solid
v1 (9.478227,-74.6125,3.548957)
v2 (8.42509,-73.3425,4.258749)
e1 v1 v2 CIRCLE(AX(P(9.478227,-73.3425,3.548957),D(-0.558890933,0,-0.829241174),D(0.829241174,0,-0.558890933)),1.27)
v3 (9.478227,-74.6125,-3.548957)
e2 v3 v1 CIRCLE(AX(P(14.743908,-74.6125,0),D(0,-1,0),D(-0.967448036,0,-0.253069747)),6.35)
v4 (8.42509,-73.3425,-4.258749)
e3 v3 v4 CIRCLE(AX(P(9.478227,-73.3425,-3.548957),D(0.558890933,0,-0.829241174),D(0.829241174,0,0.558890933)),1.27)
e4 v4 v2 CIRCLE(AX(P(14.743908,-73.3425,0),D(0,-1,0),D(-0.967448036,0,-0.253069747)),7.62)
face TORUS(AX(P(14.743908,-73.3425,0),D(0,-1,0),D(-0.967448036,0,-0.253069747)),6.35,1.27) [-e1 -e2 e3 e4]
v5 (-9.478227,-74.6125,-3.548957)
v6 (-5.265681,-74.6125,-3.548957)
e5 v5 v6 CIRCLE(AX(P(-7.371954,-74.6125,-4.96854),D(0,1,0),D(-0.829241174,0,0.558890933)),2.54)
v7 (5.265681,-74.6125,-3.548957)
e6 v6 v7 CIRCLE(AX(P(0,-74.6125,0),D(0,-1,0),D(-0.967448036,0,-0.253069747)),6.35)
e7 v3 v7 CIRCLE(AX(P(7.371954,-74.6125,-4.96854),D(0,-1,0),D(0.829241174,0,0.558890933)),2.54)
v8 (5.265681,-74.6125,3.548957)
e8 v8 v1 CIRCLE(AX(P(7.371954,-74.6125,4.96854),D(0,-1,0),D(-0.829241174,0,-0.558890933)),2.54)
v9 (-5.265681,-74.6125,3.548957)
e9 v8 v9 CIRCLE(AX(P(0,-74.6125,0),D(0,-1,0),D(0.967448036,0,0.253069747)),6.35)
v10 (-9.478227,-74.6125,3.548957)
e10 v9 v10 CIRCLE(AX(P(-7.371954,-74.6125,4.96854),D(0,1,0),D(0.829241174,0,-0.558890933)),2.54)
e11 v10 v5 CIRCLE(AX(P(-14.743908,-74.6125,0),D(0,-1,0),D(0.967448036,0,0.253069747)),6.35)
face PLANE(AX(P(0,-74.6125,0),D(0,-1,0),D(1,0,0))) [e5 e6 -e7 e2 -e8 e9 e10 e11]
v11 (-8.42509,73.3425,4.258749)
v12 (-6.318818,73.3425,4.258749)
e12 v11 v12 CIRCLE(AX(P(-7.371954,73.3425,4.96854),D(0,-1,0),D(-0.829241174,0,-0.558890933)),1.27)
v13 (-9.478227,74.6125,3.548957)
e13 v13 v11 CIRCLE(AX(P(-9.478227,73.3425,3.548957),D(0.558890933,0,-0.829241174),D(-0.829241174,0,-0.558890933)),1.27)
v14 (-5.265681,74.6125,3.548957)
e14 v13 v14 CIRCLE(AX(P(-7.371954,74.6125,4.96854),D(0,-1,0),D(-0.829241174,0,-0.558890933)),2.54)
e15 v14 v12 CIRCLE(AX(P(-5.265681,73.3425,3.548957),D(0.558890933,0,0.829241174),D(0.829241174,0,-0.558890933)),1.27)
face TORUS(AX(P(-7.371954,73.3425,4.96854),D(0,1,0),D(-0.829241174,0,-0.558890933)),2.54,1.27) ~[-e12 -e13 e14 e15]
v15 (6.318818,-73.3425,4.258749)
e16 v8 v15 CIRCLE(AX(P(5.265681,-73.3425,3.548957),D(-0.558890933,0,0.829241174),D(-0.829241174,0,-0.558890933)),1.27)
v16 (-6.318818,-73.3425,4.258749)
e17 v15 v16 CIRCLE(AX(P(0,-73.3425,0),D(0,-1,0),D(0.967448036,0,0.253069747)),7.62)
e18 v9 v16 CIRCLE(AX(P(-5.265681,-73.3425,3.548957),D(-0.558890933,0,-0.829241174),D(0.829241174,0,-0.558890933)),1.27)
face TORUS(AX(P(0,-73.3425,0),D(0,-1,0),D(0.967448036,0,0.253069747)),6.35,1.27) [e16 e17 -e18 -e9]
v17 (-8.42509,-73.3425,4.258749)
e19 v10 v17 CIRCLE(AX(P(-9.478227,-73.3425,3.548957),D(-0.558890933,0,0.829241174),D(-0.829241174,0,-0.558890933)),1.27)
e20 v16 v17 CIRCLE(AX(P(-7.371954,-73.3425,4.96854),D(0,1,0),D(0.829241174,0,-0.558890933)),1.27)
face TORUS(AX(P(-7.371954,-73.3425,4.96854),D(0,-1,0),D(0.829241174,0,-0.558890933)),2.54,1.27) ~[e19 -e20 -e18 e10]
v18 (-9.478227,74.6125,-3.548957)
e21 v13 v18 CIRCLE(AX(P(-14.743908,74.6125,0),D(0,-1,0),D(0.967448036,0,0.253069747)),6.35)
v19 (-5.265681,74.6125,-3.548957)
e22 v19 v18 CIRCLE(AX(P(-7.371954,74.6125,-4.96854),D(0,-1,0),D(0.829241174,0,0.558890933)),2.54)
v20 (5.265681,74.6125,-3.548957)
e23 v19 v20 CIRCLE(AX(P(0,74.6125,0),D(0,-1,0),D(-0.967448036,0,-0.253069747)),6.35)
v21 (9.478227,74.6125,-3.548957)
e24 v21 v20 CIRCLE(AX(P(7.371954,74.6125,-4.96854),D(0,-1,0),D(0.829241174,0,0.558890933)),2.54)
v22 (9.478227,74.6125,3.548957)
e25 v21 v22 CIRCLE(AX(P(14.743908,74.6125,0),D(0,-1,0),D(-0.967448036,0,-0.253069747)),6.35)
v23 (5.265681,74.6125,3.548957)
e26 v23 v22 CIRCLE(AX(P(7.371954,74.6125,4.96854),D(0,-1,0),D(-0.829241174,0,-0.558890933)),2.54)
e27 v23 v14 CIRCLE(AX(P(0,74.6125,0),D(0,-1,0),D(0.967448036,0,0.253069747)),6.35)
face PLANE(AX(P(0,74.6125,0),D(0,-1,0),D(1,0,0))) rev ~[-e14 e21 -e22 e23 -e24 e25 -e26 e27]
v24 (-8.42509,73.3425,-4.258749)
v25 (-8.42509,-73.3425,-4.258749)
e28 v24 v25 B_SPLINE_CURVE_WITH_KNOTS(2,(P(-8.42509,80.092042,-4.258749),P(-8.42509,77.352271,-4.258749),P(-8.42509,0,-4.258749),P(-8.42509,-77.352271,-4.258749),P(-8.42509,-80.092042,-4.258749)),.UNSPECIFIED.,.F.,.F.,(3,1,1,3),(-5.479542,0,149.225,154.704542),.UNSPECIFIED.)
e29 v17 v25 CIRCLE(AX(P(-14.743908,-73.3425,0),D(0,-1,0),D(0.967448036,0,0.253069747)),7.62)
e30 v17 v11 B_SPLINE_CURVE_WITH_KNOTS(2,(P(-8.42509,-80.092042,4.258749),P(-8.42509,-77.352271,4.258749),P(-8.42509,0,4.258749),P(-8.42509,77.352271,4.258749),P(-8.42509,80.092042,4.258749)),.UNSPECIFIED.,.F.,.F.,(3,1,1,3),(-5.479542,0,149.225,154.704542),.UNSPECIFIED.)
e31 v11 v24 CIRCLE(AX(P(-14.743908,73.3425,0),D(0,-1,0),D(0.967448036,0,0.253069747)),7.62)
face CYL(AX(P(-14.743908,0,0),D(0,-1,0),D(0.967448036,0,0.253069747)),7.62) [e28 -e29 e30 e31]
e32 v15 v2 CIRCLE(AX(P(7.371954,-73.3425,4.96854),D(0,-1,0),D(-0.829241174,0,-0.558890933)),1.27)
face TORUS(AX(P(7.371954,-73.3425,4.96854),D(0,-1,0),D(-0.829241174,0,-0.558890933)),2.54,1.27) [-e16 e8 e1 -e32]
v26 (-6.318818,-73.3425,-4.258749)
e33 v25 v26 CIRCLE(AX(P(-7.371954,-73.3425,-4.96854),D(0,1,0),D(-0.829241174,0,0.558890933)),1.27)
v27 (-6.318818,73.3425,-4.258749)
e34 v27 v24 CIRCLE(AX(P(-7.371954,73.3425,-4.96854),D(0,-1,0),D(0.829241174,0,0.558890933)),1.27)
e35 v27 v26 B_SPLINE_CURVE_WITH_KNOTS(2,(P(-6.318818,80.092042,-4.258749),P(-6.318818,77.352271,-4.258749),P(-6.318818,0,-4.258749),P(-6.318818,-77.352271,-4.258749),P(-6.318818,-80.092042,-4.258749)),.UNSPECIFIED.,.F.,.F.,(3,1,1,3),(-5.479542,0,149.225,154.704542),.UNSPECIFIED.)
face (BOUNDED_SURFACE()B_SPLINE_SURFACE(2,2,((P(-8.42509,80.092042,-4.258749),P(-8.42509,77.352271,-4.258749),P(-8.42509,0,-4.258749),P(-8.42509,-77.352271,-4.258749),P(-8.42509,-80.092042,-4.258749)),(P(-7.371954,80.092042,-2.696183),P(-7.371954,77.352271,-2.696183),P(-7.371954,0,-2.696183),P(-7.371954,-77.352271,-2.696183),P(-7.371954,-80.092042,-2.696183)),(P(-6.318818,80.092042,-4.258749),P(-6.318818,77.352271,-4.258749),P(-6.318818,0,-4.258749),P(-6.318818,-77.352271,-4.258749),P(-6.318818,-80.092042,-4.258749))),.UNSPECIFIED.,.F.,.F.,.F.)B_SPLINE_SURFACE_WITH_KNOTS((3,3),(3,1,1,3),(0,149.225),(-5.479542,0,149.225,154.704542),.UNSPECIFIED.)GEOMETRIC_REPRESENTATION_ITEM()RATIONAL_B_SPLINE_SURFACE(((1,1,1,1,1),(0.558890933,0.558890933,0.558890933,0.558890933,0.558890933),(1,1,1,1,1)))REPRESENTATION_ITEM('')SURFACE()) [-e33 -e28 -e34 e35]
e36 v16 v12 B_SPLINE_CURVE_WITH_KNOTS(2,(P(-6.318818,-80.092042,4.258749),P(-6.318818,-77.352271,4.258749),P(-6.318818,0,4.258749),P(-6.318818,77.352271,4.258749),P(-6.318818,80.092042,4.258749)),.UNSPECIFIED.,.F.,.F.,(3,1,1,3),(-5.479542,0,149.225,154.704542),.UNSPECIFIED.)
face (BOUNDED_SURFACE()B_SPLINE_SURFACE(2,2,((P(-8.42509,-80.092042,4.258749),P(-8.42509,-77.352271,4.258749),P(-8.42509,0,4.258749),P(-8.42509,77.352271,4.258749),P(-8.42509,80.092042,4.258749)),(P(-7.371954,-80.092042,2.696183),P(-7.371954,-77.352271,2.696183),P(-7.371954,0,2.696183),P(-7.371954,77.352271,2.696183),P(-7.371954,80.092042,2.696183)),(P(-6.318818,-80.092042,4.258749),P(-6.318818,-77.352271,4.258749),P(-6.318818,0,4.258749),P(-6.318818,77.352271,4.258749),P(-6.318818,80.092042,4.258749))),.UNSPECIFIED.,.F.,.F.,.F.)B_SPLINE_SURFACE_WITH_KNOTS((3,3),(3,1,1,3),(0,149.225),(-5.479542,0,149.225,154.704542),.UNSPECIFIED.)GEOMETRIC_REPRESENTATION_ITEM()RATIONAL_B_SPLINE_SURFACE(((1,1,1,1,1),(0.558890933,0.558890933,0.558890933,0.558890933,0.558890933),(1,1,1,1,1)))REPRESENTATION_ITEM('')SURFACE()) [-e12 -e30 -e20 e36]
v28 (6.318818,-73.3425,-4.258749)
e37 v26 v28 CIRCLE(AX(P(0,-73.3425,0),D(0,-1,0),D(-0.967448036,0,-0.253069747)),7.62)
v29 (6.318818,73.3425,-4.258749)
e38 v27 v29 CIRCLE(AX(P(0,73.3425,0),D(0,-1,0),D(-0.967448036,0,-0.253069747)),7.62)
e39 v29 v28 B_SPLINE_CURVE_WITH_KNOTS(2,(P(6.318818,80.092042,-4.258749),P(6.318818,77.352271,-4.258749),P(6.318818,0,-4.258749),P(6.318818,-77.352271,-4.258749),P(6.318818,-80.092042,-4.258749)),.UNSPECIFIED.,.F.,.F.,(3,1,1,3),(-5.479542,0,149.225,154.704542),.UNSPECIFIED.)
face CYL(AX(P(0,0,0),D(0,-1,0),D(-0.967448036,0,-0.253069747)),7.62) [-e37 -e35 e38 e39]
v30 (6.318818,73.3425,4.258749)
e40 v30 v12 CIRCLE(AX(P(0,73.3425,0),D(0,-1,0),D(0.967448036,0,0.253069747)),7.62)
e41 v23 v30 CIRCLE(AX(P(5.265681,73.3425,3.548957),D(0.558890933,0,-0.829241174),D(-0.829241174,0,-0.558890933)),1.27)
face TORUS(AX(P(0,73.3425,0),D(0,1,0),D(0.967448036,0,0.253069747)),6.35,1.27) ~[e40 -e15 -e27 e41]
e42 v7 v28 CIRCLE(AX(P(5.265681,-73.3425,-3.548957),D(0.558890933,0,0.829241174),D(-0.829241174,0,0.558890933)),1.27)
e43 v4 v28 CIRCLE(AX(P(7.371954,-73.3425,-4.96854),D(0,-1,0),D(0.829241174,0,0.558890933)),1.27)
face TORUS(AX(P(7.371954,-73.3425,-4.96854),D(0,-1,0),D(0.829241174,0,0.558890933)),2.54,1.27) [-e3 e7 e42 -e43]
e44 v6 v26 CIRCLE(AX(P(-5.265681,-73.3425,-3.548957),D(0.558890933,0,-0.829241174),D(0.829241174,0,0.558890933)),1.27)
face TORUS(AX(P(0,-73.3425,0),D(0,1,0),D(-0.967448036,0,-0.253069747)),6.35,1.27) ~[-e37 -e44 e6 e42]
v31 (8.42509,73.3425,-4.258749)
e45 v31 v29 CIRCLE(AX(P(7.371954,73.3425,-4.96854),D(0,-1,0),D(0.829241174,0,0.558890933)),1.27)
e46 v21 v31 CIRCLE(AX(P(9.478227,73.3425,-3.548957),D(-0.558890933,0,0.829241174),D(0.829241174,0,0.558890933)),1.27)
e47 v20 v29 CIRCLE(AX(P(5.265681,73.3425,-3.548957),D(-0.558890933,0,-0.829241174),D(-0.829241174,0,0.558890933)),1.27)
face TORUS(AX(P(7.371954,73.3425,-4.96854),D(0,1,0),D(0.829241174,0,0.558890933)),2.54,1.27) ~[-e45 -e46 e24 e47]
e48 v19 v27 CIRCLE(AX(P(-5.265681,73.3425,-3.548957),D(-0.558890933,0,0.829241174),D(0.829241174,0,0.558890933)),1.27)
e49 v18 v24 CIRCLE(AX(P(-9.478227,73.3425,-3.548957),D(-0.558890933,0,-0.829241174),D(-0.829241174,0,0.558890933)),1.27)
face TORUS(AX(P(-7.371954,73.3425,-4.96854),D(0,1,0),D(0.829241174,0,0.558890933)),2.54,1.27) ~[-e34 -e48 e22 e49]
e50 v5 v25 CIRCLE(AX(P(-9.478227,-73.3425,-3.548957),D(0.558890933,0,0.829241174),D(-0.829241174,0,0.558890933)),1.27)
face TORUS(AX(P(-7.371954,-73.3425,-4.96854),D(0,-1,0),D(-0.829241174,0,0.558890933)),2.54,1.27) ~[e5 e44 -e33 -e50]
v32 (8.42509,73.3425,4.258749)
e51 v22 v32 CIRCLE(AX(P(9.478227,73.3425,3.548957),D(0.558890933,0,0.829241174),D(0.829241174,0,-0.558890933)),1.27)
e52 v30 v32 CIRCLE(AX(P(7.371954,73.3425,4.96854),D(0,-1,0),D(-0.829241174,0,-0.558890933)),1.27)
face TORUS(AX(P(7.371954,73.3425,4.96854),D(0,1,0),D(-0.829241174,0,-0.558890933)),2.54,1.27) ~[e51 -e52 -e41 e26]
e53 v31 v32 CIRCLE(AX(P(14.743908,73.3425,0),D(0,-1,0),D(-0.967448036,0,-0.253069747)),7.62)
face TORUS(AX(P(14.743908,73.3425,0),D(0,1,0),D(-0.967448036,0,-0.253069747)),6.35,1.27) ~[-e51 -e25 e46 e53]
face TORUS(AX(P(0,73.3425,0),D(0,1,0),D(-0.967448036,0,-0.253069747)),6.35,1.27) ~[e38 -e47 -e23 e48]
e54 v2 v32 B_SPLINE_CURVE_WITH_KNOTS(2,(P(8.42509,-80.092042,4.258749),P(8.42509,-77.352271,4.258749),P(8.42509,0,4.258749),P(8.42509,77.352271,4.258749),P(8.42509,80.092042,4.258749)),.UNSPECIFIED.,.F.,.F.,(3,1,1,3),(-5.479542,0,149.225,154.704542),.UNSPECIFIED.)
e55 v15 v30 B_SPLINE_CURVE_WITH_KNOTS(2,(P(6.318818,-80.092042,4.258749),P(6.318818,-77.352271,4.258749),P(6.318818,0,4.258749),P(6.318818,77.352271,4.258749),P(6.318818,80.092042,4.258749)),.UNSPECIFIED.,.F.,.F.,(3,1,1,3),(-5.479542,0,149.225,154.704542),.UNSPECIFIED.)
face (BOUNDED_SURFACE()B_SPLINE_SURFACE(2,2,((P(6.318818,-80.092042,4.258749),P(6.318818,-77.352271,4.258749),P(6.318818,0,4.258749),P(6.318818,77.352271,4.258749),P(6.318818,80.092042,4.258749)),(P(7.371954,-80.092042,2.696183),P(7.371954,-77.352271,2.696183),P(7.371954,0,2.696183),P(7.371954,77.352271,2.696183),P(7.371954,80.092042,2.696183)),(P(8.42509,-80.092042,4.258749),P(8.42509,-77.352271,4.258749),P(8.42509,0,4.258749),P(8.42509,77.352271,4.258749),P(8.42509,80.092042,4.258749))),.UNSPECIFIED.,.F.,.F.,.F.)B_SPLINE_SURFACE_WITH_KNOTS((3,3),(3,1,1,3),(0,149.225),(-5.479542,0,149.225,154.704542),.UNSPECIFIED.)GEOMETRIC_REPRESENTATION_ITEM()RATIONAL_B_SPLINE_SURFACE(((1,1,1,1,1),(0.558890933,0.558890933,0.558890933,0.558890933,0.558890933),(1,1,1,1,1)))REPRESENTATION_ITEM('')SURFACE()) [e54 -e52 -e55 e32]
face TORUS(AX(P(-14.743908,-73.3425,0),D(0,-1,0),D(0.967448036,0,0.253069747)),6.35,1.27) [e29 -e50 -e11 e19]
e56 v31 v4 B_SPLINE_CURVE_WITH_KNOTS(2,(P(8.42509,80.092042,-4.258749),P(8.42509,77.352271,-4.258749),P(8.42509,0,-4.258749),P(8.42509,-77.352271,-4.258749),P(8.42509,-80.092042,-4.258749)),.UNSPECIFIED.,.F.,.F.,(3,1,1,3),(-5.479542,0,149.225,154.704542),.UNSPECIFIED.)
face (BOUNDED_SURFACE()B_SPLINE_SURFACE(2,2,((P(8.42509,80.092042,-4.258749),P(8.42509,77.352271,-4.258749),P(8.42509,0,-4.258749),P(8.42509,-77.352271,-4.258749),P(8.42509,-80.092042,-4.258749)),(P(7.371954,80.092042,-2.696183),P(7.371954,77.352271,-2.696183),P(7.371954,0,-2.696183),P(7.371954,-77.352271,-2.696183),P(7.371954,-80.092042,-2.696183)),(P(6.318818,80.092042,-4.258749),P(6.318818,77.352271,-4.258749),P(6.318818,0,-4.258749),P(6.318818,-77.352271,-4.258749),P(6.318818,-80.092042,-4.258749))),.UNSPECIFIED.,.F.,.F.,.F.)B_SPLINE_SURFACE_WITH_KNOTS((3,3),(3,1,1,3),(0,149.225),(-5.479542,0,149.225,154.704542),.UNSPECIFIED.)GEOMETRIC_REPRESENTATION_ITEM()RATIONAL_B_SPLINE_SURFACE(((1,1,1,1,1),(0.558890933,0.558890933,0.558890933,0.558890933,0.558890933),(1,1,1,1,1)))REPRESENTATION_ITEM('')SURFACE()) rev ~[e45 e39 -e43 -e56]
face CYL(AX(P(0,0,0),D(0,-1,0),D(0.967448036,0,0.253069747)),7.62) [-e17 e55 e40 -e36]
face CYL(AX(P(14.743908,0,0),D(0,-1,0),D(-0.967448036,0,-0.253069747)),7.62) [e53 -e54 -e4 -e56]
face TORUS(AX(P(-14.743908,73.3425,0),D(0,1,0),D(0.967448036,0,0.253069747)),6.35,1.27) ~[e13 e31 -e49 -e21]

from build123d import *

# Parameters (mm, degrees)
F1_DEPTH = 74.6125
F2_R     = 1.27


with BuildPart() as f1:
    # F0 (on Front) → F1 (new body, symmetric)
    with BuildSketch(Plane.XZ):
        with BuildLine():
            ThreePointArc((-7.3719540369, 1.9283914741), (-22.3639080738, 0), (-7.3719540369, -1.9283914741))
            ThreePointArc((-7.3719540369, -1.9283914741), (0, -7.62), (7.3719540369, -1.9283914741))
            ThreePointArc((7.3719540369, -1.9283914741), (22.3639080738, 0), (7.3719540369, 1.9283914741))
            ThreePointArc((7.3719540369, 1.9283914741), (0, 7.62), (-7.3719540369, 1.9283914741))
        make_face()
    extrude(amount=F1_DEPTH, both=True)

    # F2
    f2_edges = [f1.edges().sort_by_distance(p)[0] for p in [
        (7.371954, 0, 1.928391),
        (0, 74.6125, 7.62),
        (-7.371954, 0, 1.928391),
        (0, -74.6125, 7.62),
        (7.371954, 0, -1.928391),
        (22.363908, 74.6125, 0),
        (22.363908, -74.6125, 0),
        (-22.363908, 74.6125, 0),
        (-7.371954, 0, -1.928391),
        (-22.363908, -74.6125, 0),
        (0, 74.6125, -7.62),
        (0, -74.6125, -7.62),
    ]]
    fillet(f2_edges, radius=F2_R)


solid = f1.part
